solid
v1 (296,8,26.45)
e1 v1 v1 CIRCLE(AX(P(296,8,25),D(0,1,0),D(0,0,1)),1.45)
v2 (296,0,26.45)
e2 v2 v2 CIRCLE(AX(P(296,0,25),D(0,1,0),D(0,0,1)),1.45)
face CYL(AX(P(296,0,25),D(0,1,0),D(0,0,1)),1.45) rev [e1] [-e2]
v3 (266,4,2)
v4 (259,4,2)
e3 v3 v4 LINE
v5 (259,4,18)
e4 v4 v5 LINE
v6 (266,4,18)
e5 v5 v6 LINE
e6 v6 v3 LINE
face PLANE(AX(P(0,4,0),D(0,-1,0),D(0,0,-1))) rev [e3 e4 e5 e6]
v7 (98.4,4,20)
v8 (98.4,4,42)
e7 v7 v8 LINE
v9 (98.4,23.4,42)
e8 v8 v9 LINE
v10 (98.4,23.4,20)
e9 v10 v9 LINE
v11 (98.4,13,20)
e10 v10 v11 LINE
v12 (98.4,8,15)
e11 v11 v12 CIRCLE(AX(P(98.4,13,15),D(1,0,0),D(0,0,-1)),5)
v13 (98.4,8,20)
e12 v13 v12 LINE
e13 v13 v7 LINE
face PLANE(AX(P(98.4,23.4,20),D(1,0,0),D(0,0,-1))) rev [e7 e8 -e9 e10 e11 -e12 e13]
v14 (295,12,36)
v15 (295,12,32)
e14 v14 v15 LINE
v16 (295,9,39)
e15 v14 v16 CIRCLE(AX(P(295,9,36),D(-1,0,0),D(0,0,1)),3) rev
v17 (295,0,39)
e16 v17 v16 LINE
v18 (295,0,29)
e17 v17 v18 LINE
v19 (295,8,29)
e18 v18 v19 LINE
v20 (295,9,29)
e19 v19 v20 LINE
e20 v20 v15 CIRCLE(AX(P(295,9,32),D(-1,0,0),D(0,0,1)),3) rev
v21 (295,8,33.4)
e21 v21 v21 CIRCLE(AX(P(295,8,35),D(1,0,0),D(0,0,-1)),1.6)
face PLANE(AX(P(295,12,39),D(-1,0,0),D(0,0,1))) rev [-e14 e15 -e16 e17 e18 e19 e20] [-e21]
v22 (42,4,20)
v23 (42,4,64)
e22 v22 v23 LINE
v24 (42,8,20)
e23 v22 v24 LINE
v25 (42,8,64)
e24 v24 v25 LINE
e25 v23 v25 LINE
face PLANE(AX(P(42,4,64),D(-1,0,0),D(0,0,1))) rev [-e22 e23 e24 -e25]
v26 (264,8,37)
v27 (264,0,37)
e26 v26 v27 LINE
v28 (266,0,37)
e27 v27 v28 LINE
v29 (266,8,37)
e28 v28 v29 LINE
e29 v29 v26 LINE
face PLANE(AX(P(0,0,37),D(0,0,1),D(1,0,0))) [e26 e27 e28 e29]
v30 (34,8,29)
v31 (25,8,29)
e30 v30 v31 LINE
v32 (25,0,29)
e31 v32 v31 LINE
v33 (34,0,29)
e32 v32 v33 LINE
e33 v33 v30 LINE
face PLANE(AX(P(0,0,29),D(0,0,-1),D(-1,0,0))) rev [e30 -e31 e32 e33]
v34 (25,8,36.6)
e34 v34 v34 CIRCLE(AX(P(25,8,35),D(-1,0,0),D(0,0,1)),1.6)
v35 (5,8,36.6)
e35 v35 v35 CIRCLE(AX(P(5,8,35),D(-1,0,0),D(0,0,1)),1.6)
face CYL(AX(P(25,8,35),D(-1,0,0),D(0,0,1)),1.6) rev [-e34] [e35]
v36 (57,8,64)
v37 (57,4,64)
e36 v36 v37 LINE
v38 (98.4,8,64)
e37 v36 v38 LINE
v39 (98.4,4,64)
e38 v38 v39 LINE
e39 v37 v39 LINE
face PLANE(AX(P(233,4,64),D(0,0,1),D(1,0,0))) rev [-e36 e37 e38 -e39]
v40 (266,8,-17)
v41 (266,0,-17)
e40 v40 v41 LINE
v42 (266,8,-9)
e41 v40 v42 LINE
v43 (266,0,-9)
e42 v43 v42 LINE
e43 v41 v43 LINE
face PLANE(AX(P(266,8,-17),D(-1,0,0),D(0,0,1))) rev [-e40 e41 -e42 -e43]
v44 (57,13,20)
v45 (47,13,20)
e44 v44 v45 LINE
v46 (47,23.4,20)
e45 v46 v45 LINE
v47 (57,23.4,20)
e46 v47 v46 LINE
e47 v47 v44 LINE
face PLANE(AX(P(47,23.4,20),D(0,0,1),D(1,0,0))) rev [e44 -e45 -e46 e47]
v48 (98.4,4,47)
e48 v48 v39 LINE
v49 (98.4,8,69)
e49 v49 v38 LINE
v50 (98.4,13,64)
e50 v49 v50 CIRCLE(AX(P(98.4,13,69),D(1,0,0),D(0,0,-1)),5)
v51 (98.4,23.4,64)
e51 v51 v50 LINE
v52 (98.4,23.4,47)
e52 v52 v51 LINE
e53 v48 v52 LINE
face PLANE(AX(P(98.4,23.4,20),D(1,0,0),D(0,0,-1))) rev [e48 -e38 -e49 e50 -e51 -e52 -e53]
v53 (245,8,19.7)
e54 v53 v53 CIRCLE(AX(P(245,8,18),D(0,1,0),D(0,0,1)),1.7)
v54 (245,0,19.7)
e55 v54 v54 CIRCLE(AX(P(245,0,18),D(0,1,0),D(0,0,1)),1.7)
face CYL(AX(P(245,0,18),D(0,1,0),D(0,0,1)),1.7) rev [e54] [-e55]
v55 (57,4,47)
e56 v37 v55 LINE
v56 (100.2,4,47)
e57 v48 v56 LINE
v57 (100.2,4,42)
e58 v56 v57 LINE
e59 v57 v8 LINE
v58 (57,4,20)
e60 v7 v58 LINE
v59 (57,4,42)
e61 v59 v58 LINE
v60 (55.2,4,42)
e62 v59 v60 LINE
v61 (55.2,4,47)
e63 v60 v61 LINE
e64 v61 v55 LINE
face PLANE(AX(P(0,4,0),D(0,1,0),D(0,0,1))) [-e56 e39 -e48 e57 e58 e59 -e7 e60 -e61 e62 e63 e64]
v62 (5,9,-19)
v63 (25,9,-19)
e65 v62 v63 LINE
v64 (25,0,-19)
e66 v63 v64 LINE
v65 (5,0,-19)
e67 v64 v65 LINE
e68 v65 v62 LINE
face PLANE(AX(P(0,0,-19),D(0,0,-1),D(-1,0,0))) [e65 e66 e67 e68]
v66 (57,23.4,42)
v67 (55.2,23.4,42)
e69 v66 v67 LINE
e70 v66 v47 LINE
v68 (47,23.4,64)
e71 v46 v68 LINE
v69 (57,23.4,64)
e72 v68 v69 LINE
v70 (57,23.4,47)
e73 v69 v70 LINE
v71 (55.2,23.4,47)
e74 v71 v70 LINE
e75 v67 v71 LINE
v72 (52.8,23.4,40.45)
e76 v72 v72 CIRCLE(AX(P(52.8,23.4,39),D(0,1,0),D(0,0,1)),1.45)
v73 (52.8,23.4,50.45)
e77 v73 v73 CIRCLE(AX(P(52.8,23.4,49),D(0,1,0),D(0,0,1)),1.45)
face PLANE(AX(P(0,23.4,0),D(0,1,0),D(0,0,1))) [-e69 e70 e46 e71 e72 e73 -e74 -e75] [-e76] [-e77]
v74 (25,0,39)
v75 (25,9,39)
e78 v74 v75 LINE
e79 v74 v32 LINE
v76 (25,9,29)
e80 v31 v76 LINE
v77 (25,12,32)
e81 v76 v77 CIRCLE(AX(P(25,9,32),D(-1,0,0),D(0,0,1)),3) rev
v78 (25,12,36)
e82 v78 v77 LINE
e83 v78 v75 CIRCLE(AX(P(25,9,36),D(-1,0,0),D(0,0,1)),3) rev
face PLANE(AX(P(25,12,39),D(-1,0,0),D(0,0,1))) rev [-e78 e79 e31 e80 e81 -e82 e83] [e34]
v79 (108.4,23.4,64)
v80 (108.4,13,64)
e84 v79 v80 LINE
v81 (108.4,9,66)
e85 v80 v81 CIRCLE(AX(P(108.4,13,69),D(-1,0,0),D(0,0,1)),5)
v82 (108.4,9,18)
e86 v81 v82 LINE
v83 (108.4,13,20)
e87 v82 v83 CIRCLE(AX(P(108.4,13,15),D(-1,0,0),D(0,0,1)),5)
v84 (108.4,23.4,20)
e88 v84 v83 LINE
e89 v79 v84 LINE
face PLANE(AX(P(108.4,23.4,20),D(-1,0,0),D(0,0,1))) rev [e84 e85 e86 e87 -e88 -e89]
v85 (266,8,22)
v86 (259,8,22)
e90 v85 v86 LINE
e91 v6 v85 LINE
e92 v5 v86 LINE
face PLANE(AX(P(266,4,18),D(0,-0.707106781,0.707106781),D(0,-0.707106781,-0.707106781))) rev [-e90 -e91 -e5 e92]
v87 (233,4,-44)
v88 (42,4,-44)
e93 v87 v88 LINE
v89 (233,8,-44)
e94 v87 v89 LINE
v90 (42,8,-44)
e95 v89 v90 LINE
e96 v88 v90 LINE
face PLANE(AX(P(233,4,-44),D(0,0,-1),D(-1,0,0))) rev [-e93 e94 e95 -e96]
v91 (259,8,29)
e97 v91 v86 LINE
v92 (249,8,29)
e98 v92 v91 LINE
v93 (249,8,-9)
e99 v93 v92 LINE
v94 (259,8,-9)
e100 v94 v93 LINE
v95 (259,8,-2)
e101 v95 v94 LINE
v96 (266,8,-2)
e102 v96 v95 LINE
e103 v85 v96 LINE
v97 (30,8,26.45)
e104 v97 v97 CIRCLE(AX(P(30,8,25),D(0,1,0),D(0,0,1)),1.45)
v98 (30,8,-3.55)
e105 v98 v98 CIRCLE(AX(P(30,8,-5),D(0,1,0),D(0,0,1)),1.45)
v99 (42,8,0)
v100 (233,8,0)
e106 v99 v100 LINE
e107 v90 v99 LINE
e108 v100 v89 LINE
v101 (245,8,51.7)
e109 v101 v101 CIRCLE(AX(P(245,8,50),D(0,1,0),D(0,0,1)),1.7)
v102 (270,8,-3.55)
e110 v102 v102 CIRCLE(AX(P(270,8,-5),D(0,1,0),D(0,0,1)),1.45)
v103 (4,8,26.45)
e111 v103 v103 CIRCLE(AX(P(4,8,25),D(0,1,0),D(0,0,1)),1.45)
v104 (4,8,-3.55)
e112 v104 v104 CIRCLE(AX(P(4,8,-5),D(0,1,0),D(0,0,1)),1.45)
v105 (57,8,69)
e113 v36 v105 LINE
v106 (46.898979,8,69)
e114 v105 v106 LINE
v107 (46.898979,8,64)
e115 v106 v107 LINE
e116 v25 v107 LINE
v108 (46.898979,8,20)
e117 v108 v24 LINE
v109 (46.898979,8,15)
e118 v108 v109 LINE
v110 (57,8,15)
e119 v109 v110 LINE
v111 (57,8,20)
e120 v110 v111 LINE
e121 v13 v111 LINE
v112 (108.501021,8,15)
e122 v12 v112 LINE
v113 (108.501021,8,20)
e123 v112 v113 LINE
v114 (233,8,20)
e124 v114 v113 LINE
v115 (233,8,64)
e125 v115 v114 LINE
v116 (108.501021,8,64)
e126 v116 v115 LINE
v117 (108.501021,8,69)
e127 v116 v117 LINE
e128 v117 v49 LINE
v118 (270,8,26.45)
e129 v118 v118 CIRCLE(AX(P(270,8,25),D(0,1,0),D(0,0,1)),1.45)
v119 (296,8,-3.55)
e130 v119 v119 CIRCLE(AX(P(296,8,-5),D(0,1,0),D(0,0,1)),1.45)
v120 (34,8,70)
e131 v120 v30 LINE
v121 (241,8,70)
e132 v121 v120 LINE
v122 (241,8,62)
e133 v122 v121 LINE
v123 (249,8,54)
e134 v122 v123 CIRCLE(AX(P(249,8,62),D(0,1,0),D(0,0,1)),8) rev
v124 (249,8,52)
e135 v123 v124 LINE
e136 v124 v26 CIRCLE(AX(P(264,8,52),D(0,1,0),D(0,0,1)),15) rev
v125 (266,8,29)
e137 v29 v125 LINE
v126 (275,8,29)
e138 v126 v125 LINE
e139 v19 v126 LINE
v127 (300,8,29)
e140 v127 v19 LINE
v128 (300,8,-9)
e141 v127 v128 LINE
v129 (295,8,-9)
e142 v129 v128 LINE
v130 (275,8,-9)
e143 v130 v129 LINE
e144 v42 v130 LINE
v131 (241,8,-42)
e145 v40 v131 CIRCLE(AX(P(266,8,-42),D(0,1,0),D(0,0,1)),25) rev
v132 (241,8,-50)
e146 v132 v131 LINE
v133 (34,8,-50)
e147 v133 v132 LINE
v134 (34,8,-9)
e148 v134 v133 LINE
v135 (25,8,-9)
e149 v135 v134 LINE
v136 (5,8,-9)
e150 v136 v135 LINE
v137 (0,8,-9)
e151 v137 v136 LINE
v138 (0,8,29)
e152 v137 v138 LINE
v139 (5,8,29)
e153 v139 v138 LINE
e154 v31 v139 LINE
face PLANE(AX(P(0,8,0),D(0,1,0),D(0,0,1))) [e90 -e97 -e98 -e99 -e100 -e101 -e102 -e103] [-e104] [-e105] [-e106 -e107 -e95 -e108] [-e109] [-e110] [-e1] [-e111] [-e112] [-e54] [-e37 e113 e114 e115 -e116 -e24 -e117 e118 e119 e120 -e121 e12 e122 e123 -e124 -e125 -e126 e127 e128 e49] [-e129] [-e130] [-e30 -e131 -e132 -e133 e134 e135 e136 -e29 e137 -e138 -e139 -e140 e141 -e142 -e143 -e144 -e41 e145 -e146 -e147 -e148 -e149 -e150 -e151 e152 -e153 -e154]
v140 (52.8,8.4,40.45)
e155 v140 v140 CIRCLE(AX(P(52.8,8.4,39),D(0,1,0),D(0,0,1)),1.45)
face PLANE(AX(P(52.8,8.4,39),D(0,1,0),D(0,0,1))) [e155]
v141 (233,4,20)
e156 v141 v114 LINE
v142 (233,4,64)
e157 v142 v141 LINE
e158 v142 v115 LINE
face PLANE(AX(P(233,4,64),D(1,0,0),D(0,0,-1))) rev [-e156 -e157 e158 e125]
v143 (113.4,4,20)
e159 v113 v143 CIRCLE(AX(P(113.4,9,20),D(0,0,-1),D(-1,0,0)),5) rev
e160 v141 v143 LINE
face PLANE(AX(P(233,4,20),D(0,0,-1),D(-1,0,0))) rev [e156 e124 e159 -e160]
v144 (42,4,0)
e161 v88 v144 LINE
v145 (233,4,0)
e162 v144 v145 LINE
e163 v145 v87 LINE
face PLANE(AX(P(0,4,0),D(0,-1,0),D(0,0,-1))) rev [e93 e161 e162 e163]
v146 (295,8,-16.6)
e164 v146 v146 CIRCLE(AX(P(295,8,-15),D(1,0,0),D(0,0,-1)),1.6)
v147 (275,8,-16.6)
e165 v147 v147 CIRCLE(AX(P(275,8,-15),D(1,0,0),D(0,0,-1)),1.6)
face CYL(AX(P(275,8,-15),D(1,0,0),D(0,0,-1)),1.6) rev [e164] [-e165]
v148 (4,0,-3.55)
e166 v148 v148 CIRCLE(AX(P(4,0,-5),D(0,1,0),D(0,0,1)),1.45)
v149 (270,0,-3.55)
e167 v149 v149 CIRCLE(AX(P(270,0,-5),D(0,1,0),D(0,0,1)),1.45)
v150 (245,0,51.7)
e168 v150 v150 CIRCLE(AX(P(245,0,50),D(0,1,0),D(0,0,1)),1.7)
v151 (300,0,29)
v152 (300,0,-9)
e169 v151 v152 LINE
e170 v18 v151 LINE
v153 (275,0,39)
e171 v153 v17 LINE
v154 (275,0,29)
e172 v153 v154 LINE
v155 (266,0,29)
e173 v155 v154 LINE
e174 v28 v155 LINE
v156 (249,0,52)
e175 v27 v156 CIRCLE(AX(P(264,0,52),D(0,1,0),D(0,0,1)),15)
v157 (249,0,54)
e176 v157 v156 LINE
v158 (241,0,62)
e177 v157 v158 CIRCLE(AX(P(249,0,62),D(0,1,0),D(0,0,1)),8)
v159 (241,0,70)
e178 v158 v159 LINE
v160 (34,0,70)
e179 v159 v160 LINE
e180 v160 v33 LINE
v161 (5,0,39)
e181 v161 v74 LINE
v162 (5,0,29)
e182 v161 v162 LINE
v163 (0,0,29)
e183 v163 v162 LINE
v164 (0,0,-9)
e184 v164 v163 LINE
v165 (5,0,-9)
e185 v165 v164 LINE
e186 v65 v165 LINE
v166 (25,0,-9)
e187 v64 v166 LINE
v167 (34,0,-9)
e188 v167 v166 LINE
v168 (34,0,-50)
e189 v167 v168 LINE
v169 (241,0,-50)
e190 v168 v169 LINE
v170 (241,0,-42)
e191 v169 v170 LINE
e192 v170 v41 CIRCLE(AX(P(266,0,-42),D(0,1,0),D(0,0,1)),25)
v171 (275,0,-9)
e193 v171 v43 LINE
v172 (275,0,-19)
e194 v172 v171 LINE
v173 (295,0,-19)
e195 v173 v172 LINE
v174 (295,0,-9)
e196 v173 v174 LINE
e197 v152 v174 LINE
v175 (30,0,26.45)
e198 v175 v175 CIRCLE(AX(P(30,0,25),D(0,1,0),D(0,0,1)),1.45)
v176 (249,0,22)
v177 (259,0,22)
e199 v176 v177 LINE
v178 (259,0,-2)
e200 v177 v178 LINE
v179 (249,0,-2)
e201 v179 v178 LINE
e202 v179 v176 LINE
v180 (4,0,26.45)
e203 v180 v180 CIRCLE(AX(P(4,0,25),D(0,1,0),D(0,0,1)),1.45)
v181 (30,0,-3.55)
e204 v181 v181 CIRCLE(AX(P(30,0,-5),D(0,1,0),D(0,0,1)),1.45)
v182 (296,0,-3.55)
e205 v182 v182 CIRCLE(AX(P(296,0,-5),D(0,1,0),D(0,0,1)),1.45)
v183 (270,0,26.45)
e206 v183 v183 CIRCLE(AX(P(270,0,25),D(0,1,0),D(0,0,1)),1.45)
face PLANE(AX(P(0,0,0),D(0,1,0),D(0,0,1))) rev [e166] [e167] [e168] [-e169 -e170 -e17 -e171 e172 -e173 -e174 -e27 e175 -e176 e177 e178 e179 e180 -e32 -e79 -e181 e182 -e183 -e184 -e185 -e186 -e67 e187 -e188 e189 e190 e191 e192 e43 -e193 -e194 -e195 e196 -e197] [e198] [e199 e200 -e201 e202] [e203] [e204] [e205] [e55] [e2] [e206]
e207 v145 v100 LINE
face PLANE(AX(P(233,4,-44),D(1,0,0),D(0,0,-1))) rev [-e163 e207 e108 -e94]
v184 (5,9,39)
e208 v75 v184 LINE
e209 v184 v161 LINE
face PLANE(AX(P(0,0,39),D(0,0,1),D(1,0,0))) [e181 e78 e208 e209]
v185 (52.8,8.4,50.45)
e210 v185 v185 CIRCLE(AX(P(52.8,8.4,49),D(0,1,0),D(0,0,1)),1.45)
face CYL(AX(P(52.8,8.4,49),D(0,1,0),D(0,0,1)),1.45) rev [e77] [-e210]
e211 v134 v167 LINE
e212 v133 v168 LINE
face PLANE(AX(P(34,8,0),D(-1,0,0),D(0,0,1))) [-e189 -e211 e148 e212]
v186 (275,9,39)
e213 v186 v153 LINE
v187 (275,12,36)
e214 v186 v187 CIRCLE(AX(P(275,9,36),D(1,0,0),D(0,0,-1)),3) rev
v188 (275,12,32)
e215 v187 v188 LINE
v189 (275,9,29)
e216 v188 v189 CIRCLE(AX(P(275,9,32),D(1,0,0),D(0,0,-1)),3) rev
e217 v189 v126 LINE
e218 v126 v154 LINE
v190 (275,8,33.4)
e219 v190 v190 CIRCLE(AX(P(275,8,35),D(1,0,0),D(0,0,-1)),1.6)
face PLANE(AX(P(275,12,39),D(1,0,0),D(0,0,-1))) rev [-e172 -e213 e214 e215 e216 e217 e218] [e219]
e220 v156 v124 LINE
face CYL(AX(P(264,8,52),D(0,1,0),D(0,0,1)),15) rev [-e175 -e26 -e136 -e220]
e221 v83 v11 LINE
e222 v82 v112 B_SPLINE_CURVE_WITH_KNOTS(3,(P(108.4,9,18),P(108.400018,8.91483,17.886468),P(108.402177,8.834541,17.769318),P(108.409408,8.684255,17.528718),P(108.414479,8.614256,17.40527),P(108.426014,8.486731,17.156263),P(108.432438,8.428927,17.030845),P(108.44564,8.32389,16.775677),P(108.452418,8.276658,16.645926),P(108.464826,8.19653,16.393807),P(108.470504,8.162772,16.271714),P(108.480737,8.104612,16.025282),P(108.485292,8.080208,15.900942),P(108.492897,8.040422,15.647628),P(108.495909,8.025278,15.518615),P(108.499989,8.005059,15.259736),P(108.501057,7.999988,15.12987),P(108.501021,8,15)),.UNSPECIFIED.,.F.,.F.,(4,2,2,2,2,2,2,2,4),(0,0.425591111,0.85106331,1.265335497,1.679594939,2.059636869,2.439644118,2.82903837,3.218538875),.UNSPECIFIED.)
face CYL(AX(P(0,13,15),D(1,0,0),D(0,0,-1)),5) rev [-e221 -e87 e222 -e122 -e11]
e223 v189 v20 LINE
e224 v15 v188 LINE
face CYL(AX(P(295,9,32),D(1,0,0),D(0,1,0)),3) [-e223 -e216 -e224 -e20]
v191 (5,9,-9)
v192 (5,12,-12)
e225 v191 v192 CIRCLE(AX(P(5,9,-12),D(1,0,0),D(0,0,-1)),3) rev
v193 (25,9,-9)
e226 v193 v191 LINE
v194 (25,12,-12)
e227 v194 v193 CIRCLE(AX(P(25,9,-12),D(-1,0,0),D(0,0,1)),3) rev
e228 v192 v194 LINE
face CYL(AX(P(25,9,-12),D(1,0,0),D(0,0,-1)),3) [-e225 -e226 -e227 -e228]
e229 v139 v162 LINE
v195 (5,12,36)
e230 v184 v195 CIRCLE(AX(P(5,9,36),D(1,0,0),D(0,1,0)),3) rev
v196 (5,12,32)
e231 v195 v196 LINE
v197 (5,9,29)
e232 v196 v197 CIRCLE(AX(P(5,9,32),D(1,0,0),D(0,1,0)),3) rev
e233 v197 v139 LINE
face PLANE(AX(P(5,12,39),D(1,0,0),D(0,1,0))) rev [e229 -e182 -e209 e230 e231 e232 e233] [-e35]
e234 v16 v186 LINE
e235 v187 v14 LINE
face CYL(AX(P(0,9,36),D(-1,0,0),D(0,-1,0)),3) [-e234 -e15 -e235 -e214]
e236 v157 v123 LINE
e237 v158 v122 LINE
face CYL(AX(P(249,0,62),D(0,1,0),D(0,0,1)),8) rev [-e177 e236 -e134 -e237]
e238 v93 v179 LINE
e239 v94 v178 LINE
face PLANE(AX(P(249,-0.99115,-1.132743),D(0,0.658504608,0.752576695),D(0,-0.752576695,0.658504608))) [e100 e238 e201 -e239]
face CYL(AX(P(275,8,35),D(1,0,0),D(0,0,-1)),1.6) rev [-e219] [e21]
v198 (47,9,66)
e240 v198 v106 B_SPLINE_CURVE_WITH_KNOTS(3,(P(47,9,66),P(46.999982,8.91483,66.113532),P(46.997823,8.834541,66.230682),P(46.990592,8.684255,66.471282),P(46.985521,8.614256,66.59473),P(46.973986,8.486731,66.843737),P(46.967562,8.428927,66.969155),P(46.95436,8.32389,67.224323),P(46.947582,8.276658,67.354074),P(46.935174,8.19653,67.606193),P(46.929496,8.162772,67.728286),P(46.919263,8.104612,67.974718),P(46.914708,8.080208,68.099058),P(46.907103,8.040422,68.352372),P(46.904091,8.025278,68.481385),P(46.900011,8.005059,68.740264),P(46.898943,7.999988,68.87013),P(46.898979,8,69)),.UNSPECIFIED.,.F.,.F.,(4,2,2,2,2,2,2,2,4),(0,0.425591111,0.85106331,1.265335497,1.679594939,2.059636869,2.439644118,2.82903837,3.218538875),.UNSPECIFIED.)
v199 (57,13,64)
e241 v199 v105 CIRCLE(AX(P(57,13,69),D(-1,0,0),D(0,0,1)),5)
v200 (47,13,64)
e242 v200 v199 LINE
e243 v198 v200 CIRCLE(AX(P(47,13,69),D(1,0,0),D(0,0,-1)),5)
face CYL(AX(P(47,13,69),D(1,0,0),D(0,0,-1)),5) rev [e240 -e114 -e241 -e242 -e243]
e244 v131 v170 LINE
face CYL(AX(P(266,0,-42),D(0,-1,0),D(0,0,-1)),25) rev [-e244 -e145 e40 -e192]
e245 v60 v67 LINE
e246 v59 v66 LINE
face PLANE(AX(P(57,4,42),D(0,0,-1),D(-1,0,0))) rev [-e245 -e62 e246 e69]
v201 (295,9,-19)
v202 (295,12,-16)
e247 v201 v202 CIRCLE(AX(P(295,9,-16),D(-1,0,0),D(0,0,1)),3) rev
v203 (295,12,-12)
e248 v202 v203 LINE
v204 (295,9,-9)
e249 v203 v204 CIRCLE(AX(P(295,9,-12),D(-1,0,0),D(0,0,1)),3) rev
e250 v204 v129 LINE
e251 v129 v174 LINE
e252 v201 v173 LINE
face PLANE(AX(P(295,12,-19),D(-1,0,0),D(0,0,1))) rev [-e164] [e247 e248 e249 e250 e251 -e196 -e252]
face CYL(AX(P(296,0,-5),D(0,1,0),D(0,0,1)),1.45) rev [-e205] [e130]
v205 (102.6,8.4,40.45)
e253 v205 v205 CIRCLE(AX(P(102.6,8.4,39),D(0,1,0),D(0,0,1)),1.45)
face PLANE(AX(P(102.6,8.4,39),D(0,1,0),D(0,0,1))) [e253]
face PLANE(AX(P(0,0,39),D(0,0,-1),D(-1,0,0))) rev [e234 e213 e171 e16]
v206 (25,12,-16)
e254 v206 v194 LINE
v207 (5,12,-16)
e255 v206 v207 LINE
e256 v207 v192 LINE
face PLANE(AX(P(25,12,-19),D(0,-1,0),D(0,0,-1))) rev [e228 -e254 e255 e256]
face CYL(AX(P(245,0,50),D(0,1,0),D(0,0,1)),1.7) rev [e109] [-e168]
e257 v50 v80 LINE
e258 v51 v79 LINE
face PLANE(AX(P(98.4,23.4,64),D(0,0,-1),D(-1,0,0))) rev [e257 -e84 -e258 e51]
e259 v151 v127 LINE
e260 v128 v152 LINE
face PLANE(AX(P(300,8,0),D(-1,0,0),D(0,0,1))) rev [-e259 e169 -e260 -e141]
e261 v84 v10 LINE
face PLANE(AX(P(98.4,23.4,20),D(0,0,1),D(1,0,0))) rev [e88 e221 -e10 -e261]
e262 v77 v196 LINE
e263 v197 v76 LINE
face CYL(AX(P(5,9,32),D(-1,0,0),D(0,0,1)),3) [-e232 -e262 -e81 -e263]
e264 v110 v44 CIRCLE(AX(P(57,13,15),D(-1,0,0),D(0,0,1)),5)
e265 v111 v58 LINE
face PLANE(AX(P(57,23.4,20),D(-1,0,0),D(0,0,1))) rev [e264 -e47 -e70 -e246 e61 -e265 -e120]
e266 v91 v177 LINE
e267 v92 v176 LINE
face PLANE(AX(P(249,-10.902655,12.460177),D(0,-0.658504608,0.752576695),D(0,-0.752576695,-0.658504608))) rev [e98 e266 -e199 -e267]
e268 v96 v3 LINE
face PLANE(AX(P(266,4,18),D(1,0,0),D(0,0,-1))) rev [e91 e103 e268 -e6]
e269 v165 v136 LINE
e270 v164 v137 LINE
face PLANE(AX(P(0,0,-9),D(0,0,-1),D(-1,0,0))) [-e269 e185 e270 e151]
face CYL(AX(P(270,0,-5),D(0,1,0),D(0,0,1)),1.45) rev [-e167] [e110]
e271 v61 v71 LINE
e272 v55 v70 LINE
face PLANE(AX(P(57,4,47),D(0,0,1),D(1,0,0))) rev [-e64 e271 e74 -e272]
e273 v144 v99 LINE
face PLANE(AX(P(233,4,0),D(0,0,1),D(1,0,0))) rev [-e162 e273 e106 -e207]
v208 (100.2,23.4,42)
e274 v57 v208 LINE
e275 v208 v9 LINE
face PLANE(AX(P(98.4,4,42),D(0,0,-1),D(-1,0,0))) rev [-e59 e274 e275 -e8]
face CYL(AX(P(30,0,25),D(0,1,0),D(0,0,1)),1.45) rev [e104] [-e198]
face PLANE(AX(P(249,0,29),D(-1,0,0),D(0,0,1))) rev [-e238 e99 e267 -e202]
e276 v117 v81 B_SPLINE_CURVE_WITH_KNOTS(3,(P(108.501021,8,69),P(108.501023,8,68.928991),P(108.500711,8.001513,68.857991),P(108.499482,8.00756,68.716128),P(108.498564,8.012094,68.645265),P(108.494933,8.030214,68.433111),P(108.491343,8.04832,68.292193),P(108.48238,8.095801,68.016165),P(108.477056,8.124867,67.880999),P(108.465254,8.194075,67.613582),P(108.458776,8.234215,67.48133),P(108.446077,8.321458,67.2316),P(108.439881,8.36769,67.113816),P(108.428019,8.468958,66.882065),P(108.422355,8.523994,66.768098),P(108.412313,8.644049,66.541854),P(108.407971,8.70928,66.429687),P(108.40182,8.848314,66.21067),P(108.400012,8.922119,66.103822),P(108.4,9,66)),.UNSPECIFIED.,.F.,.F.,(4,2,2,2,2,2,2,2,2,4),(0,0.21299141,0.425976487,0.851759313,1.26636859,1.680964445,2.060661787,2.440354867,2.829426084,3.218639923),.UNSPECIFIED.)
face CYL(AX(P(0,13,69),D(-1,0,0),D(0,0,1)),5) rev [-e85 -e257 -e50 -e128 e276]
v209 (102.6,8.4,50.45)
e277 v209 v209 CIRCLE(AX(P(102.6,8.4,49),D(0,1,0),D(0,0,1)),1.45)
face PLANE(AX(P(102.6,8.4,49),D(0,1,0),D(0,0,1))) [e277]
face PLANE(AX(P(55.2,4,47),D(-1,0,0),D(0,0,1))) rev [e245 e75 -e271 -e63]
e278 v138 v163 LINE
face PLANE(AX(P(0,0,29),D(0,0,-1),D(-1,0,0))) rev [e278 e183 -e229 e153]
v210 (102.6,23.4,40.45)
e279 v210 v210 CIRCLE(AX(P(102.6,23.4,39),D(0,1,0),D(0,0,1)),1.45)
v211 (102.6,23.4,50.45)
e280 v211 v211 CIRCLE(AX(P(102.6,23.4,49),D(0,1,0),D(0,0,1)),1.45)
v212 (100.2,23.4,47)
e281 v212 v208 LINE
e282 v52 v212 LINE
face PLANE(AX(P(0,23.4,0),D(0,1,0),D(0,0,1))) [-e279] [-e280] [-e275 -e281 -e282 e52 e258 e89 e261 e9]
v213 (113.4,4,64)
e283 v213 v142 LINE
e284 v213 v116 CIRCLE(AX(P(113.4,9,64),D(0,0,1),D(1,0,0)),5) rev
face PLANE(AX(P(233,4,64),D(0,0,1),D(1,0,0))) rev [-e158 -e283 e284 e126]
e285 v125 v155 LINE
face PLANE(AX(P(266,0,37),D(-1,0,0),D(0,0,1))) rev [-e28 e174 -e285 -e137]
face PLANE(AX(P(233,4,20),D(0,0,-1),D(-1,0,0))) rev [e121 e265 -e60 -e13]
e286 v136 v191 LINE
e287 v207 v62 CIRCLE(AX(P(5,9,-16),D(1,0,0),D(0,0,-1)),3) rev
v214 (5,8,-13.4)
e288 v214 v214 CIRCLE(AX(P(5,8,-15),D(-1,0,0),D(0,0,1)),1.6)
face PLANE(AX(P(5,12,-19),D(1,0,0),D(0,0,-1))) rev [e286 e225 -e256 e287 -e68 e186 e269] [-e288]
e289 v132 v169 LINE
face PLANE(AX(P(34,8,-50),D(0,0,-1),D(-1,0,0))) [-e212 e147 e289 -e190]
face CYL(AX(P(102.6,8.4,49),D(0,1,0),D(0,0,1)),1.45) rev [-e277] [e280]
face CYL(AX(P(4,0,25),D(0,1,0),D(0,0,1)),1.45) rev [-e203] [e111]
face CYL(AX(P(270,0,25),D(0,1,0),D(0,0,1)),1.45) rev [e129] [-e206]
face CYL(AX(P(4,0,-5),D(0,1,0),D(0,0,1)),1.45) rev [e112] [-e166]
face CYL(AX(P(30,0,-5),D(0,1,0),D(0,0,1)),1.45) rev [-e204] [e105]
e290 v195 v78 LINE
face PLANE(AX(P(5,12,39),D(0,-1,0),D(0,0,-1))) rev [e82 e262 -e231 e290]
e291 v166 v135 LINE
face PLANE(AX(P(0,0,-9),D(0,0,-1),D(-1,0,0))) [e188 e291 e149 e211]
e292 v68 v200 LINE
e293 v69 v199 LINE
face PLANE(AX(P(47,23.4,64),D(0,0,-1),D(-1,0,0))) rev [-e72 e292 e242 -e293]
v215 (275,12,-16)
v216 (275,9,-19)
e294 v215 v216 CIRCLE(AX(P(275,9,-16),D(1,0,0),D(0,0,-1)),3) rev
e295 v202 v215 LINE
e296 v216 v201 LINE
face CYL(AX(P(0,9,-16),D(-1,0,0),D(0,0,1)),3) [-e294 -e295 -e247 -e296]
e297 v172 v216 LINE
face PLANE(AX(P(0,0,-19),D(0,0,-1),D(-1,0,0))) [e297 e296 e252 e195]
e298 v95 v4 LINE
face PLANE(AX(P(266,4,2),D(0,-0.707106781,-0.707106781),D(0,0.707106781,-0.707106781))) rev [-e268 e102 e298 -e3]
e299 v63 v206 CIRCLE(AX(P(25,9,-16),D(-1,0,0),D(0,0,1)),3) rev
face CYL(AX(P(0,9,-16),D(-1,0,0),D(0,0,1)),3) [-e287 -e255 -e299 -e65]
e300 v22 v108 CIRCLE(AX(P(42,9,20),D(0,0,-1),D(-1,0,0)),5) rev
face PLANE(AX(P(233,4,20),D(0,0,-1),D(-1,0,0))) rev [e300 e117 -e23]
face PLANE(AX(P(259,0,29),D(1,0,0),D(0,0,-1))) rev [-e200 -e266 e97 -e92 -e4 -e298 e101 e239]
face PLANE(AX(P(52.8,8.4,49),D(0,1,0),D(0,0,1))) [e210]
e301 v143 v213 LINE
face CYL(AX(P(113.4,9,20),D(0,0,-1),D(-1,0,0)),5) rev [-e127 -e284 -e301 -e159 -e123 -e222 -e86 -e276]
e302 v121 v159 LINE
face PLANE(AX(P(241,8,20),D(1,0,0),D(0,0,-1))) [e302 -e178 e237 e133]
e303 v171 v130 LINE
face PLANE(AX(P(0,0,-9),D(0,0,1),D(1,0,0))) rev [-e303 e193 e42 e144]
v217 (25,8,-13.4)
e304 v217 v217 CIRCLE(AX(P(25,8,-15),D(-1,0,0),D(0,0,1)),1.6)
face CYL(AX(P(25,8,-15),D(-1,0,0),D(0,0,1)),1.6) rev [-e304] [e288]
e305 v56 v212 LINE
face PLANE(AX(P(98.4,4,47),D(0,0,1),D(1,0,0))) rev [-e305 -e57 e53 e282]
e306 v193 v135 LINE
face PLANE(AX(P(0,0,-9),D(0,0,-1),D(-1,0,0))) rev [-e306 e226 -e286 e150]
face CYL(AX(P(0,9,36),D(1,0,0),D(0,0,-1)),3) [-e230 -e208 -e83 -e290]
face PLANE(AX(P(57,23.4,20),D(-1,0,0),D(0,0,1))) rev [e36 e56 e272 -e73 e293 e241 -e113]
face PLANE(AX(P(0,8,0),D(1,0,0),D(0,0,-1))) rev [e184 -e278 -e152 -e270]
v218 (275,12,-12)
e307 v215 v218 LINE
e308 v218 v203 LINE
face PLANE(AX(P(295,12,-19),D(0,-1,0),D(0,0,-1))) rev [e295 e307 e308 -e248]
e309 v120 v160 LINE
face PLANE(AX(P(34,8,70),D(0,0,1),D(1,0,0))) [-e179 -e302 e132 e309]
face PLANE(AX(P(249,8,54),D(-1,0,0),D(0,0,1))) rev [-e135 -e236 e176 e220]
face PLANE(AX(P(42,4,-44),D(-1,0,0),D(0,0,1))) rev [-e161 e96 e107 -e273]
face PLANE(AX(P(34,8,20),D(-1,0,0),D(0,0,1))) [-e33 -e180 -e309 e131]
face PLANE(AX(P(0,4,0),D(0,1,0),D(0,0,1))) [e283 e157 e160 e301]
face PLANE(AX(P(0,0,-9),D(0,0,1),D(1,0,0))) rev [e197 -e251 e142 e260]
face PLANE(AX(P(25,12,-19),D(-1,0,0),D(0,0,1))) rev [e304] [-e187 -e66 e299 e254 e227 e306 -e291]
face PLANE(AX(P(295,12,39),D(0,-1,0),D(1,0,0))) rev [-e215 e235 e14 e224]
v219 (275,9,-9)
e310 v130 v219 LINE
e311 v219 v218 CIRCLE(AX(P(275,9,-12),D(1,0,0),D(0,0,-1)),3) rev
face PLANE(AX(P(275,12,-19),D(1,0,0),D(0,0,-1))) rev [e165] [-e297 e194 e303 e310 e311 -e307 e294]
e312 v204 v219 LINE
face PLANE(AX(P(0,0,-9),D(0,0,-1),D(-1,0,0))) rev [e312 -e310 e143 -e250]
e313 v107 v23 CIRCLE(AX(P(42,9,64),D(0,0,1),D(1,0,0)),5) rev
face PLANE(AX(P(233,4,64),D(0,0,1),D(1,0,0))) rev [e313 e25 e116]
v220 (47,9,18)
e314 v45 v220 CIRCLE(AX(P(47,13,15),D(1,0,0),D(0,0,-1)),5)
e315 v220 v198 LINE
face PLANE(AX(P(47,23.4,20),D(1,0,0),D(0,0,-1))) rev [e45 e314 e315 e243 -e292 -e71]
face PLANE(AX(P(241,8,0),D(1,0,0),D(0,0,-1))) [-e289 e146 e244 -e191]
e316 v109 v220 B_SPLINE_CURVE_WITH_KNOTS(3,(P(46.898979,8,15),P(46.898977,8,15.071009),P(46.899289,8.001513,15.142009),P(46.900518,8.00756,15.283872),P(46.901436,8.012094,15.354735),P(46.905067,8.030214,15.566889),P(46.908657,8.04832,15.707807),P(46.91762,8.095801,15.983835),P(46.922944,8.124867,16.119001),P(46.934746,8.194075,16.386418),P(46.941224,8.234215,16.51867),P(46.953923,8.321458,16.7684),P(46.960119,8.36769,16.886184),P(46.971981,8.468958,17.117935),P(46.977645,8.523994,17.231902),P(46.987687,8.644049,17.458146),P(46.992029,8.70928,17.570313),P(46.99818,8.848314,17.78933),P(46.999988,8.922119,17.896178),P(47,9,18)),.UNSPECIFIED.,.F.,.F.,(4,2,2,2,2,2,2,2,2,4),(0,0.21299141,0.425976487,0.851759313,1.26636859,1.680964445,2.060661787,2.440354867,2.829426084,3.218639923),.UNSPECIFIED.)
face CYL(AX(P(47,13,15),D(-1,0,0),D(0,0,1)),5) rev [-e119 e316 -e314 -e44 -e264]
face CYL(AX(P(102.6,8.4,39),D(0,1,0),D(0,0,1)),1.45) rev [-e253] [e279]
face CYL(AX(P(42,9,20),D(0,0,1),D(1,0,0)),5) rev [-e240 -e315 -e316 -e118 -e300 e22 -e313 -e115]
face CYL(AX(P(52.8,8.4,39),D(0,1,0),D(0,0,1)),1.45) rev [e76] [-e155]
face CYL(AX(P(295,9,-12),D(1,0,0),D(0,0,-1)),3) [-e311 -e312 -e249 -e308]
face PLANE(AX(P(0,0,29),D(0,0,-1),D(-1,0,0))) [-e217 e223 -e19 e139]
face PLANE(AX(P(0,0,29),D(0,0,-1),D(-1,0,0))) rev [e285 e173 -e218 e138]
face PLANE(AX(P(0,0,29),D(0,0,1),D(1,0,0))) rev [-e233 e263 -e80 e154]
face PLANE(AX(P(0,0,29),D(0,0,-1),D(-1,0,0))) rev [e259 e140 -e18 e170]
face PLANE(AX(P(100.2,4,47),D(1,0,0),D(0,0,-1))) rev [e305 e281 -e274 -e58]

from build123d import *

# Parameters (mm, degrees)
SKETCH1_W            = 300
SKETCH1_H            = 20
BOSS_EXTRUDE1_DEPTH  = 8
SKETCH2_W            = 34
SKETCH2_H            = 8
BOSS_EXTRUDE2_DEPTH  = 9
SKETCH3_W            = 34
SKETCH3_H            = 8
BOSS_EXTRUDE3_DEPTH  = 9
SKETCH4_R            = 1.45
CUT_EXTRUDE1_DEPTH   = 302.504560496
SKETCH5_W            = 25
SKETCH5_H            = 8
BOSS_EXTRUDE4_DEPTH  = 17
SKETCH6_W            = 25
SKETCH6_H            = 8
BOSS_EXTRUDE5_DEPTH  = 17
SKETCH7_W            = 10
SKETCH7_H            = 38
CUT_EXTRUDE2_DEPTH   = 303.37890138
SKETCH8_W            = 7
SKETCH8_H            = 16
CUT_EXTRUDE3_DEPTH   = 4
CUT_EXTRUDE4_DEPTH   = 7
BOSS_EXTRUDE6_DEPTH  = 10
SKETCH12_W           = 8
SKETCH12_H           = 8
BOSS_EXTRUDE7_DEPTH  = 17
SKETCH13_R           = 1.7
CUT_EXTRUDE6_DEPTH   = 305.926220585
SKETCH14_W           = 20
SKETCH14_H           = 12
BOSS_EXTRUDE8_DEPTH  = 10
SKETCH15_R           = 1.6
CUT_EXTRUDE7_DEPTH   = 20
SKETCH16_W           = 20
SKETCH16_H           = 12
BOSS_EXTRUDE9_DEPTH  = 10
SKETCH17_R           = 1.6
CUT_EXTRUDE8_DEPTH   = 20
SKETCH18_W           = 20
SKETCH18_H           = 12
BOSS_EXTRUDE10_DEPTH = 10
CUT_EXTRUDE9_START   = -20
SKETCH19_R           = 1.6
CUT_EXTRUDE9_DEPTH   = 20
SKETCH20_W           = 20
SKETCH20_H           = 12
BOSS_EXTRUDE11_DEPTH = 10
CUT_EXTRUDE10_START  = -20
SKETCH21_R           = 1.6
CUT_EXTRUDE10_DEPTH  = 20
SKETCH22_W           = 207
SKETCH22_H           = 50
BOSS_EXTRUDE12_DEPTH = 8
SKETCH23_W           = 191
SKETCH23_H           = 44
CUT_EXTRUDE11_DEPTH  = 4
SKETCH24_W           = 10
SKETCH24_H           = 44
BOSS_EXTRUDE14_DEPTH = 19.4
SKETCH25_R           = 1.45
CUT_EXTRUDE12_DEPTH  = 15
FILLET1_R            = 5
FILLET2_R            = 5
FILLET3_R            = 8
FILLET4_R            = 15
FILLET5_R            = 25
FILLET6_R            = 3
SKETCH27_W           = 1.8
SKETCH27_H           = 5
CUT_EXTRUDE13_DEPTH  = 19.4


with BuildPart() as part:
    # Sketch1 → Boss-Extrude1 (new body)
    with BuildSketch(Plane(origin=(0, 0, 0), x_dir=(1, 0, 0), z_dir=(0, 1, 0))):
        with Locations((150, -10)):
            Rectangle(SKETCH1_W, SKETCH1_H)
    extrude(amount=BOSS_EXTRUDE1_DEPTH)

    # Sketch2 → Boss-Extrude2 (add)
    with BuildSketch(Plane.XY.offset(20)):
        with Locations((17, 4)):
            Rectangle(SKETCH2_W, SKETCH2_H)
        with Locations((283, 4)):
            Rectangle(SKETCH2_W, SKETCH2_H)
    extrude(amount=BOSS_EXTRUDE2_DEPTH)

    # Sketch3 → Boss-Extrude3 (add)
    with BuildSketch(Plane(origin=(0, 0, 0), x_dir=(-1, 0, 0), z_dir=(0, 0, -1))):
        with Locations((-17, 4)):
            Rectangle(SKETCH3_W, SKETCH3_H)
        with Locations((-283, 4)):
            Rectangle(SKETCH3_W, SKETCH3_H)
    extrude(amount=BOSS_EXTRUDE3_DEPTH)

    # Sketch4 → Cut-Extrude1 (cut, through all)
    with BuildSketch(Plane(origin=(0, 8, 0), x_dir=(1, 0, 0), z_dir=(0, 1, 0))):
        with Locations(Location((4, 5, 0), (0, 0, 270))):
            Circle(SKETCH4_R)
        with Locations(Location((30, 5, 0), (0, 0, 270))):
            Circle(SKETCH4_R)
        with Locations(Location((30, -25, 0), (0, 0, 270))):
            Circle(SKETCH4_R)
        with Locations(Location((4, -25, 0), (0, 0, 270))):
            Circle(SKETCH4_R)
        with Locations(Location((296, -25, 0), (0, 0, 270))):
            Circle(SKETCH4_R)
        with Locations(Location((296, 5, 0), (0, 0, 270))):
            Circle(SKETCH4_R)
        with Locations(Location((270, -25, 0), (0, 0, 270))):
            Circle(SKETCH4_R)
        with Locations(Location((270, 5, 0), (0, 0, 270))):
            Circle(SKETCH4_R)
    extrude(amount=-CUT_EXTRUDE1_DEPTH, mode=Mode.SUBTRACT)

    # Sketch5 → Boss-Extrude4 (add)
    with BuildSketch(Plane.XY.offset(20)):
        with Locations((253.5, 4)):
            Rectangle(SKETCH5_W, SKETCH5_H)
    extrude(amount=BOSS_EXTRUDE4_DEPTH)

    # Sketch6 → Boss-Extrude5 (add)
    with BuildSketch(Plane(origin=(0, 0, 0), x_dir=(-1, 0, 0), z_dir=(0, 0, -1))):
        with Locations((-253.5, 4)):
            Rectangle(SKETCH6_W, SKETCH6_H)
    extrude(amount=BOSS_EXTRUDE5_DEPTH)

    # Sketch7 → Cut-Extrude2 (cut, through all)
    with BuildSketch(Plane(origin=(0, 8, 0), x_dir=(1, 0, 0), z_dir=(0, 1, 0))):
        with Locations((254, -10)):
            Rectangle(SKETCH7_W, SKETCH7_H)
    extrude(amount=-CUT_EXTRUDE2_DEPTH, mode=Mode.SUBTRACT)

    # Sketch8 → Cut-Extrude3 (cut)
    with BuildSketch(Plane(origin=(0, 8, 0), x_dir=(1, 0, 0), z_dir=(0, 1, 0))):
        with Locations((262.5, -10)):
            Rectangle(SKETCH8_W, SKETCH8_H)
    extrude(amount=-CUT_EXTRUDE3_DEPTH, mode=Mode.SUBTRACT)

    # Sketch9 → Cut-Extrude4 (cut)
    with BuildSketch(Plane.ZY.offset(-259)):
        Polygon((18, 4), (22, 8), (18, 8), align=None)
        Polygon((2, 4), (-2, 8), (2, 8), align=None)
    extrude(amount=-CUT_EXTRUDE4_DEPTH, mode=Mode.SUBTRACT)

    # Sketch10 → Boss-Extrude6 (add)
    with BuildSketch(Plane.ZY.offset(-259)):
        Polygon((-2, 0), (-9, 8), (-9, 0), align=None)
        Polygon((29, 8), (22, 0), (29, 0), align=None)
    extrude(amount=BOSS_EXTRUDE6_DEPTH)

    # Sketch12 → Boss-Extrude7 (add)
    with BuildSketch(Plane.XY.offset(37)):
        with Locations((245, 4)):
            Rectangle(SKETCH12_W, SKETCH12_H)
    extrude(amount=BOSS_EXTRUDE7_DEPTH)

    # Sketch13 → Cut-Extrude6 (cut, through all)
    with BuildSketch(Plane(origin=(0, 8, 0), x_dir=(1, 0, 0), z_dir=(0, 1, 0))):
        with Locations(Location((245, -50, 0), (0, 0, 270))):
            Circle(SKETCH13_R)
        with Locations(Location((245, -18, 0), (0, 0, 270))):
            Circle(SKETCH13_R)
    extrude(amount=-CUT_EXTRUDE6_DEPTH, mode=Mode.SUBTRACT)

    # Sketch14 → Boss-Extrude8 (add)
    with BuildSketch(Plane.XY.offset(29)):
        with Locations((285, 6)):
            Rectangle(SKETCH14_W, SKETCH14_H)
    extrude(amount=BOSS_EXTRUDE8_DEPTH)

    # Sketch15 → Cut-Extrude7 (cut)
    with BuildSketch(Plane(origin=(295, 0, 0), x_dir=(0, 0, -1), z_dir=(1, 0, 0))):
        with Locations((-35, 8)):
            Circle(SKETCH15_R)
    extrude(amount=-CUT_EXTRUDE7_DEPTH, mode=Mode.SUBTRACT)

    # Sketch16 → Boss-Extrude9 (add)
    with BuildSketch(Plane(origin=(0, 0, -9), x_dir=(-1, 0, 0), z_dir=(0, 0, -1))):
        with Locations((-285, 6)):
            Rectangle(SKETCH16_W, SKETCH16_H)
    extrude(amount=BOSS_EXTRUDE9_DEPTH)

    # Sketch17 → Cut-Extrude8 (cut)
    with BuildSketch(Plane(origin=(295, 0, 0), x_dir=(0, 0, -1), z_dir=(1, 0, 0))):
        with Locations((15, 8)):
            Circle(SKETCH17_R)
    extrude(amount=-CUT_EXTRUDE8_DEPTH, mode=Mode.SUBTRACT)

    # Sketch18 → Boss-Extrude10 (add)
    with BuildSketch(Plane(origin=(0, 0, -9), x_dir=(-1, 0, 0), z_dir=(0, 0, -1))):
        with Locations((-15, 6)):
            Rectangle(SKETCH18_W, SKETCH18_H)
    extrude(amount=BOSS_EXTRUDE10_DEPTH)

    # Sketch19 → Cut-Extrude9 (cut)
    with BuildSketch(Plane.ZY.offset(-5).offset(CUT_EXTRUDE9_START)):
        with Locations(Location((-15, 8, 0), (0, 0, 180))):
            Circle(SKETCH19_R)
    extrude(amount=CUT_EXTRUDE9_DEPTH, mode=Mode.SUBTRACT)

    # Sketch20 → Boss-Extrude11 (add)
    with BuildSketch(Plane.XY.offset(29)):
        with Locations((15, 6)):
            Rectangle(SKETCH20_W, SKETCH20_H)
    extrude(amount=BOSS_EXTRUDE11_DEPTH)

    # Sketch21 → Cut-Extrude10 (cut)
    with BuildSketch(Plane.ZY.offset(-5).offset(CUT_EXTRUDE10_START)):
        with Locations(Location((35, 8, 0), (0, 0, 180))):
            Circle(SKETCH21_R)
    extrude(amount=CUT_EXTRUDE10_DEPTH, mode=Mode.SUBTRACT)

    # Sketch22 → Boss-Extrude12 (add)
    with BuildSketch(Plane(origin=(0, 0, 0), x_dir=(-1, 0, 0), z_dir=(0, -1, 0))):
        with Locations((-137.5, -45)):
            Rectangle(SKETCH22_W, SKETCH22_H)
        with Locations((-137.5, 25)):
            Rectangle(SKETCH22_W, SKETCH22_H)
    extrude(amount=-BOSS_EXTRUDE12_DEPTH)

    # Sketch23 → Cut-Extrude11 (cut)
    with BuildSketch(Plane(origin=(0, 8, 0), x_dir=(1, 0, 0), z_dir=(0, 1, 0))):
        with Locations((137.5, -42)):
            Rectangle(SKETCH23_W, SKETCH23_H)
        with Locations((137.5, 22)):
            Rectangle(SKETCH23_W, SKETCH23_H)
    extrude(amount=-CUT_EXTRUDE11_DEPTH, mode=Mode.SUBTRACT)

    # Sketch24 → Boss-Extrude14 (add)
    with BuildSketch(Plane(origin=(0, 4, 0), x_dir=(1, 0, 0), z_dir=(0, 1, 0))):
        with Locations((103.4, -42)):
            Rectangle(SKETCH24_W, SKETCH24_H)
        with Locations((52, -42)):
            Rectangle(SKETCH24_W, SKETCH24_H)
    extrude(amount=BOSS_EXTRUDE14_DEPTH)

    # Sketch25 → Cut-Extrude12 (cut)
    with BuildSketch(Plane(origin=(0, 23.4, 0), x_dir=(1, 0, 0), z_dir=(0, 1, 0))):
        with Locations(Location((102.6, -49, 0), (0, 0, 270))):
            Circle(SKETCH25_R)
        with Locations(Location((102.6, -39, 0), (0, 0, 270))):
            Circle(SKETCH25_R)
        with Locations(Location((52.8, -49, 0), (0, 0, 270))):
            Circle(SKETCH25_R)
        with Locations(Location((52.8, -39, 0), (0, 0, 270))):
            Circle(SKETCH25_R)
    extrude(amount=-CUT_EXTRUDE12_DEPTH, mode=Mode.SUBTRACT)

    # Fillet1
    fillet1_edges = [part.edges().sort_by_distance(p)[0] for p in [
        (103.4, 8, 64),
        (103.4, 8, 20),
        (52, 8, 64),
        (52, 8, 20),
    ]]
    fillet(fillet1_edges, radius=FILLET1_R)

    # Fillet2
    fillet2_edges = [part.edges().sort_by_distance(p)[0] for p in [
        (47, 4, 42),
        (108.4, 4, 42),
    ]]
    fillet(fillet2_edges, radius=FILLET2_R - 0.0001)  # a hair under: the kernel refuses the full size

    # Fillet3
    fillet3_edges = [part.edges().sort_by_distance(p)[0] for p in [
        (241, 4, 54),
    ]]
    fillet(fillet3_edges, radius=FILLET3_R - 0.0001)  # a hair under: the kernel refuses the full size

    # Fillet4
    fillet4_edges = [part.edges().sort_by_distance(p)[0] for p in [
        (249, 4, 37),
    ]]
    fillet(fillet4_edges, radius=FILLET4_R)

    # Fillet5
    fillet5_edges = [part.edges().sort_by_distance(p)[0] for p in [
        (241, 4, -17),
    ]]
    fillet(fillet5_edges, radius=FILLET5_R - 0.0001)  # a hair under: the kernel refuses the full size

    # Fillet6
    fillet6_edges = [part.edges().sort_by_distance(p)[0] for p in [
        (285, 12, 29),
        (285, 12, 39),
        (285, 12, -9),
        (285, 12, -19),
        (15, 12, -9),
        (15, 12, -19),
        (15, 12, 29),
        (15, 12, 39),
    ]]
    fillet(fillet6_edges, radius=FILLET6_R)

    # Sketch27 → Cut-Extrude13 (cut)
    with BuildSketch(Plane(origin=(0, 23.4, 0), x_dir=(1, 0, 0), z_dir=(0, 1, 0))):
        with Locations((56.1, -44.5)):
            Rectangle(SKETCH27_W, SKETCH27_H)
        with Locations((99.3, -44.5)):
            Rectangle(SKETCH27_W, SKETCH27_H)
    extrude(amount=-CUT_EXTRUDE13_DEPTH, mode=Mode.SUBTRACT)


solid = part.part
